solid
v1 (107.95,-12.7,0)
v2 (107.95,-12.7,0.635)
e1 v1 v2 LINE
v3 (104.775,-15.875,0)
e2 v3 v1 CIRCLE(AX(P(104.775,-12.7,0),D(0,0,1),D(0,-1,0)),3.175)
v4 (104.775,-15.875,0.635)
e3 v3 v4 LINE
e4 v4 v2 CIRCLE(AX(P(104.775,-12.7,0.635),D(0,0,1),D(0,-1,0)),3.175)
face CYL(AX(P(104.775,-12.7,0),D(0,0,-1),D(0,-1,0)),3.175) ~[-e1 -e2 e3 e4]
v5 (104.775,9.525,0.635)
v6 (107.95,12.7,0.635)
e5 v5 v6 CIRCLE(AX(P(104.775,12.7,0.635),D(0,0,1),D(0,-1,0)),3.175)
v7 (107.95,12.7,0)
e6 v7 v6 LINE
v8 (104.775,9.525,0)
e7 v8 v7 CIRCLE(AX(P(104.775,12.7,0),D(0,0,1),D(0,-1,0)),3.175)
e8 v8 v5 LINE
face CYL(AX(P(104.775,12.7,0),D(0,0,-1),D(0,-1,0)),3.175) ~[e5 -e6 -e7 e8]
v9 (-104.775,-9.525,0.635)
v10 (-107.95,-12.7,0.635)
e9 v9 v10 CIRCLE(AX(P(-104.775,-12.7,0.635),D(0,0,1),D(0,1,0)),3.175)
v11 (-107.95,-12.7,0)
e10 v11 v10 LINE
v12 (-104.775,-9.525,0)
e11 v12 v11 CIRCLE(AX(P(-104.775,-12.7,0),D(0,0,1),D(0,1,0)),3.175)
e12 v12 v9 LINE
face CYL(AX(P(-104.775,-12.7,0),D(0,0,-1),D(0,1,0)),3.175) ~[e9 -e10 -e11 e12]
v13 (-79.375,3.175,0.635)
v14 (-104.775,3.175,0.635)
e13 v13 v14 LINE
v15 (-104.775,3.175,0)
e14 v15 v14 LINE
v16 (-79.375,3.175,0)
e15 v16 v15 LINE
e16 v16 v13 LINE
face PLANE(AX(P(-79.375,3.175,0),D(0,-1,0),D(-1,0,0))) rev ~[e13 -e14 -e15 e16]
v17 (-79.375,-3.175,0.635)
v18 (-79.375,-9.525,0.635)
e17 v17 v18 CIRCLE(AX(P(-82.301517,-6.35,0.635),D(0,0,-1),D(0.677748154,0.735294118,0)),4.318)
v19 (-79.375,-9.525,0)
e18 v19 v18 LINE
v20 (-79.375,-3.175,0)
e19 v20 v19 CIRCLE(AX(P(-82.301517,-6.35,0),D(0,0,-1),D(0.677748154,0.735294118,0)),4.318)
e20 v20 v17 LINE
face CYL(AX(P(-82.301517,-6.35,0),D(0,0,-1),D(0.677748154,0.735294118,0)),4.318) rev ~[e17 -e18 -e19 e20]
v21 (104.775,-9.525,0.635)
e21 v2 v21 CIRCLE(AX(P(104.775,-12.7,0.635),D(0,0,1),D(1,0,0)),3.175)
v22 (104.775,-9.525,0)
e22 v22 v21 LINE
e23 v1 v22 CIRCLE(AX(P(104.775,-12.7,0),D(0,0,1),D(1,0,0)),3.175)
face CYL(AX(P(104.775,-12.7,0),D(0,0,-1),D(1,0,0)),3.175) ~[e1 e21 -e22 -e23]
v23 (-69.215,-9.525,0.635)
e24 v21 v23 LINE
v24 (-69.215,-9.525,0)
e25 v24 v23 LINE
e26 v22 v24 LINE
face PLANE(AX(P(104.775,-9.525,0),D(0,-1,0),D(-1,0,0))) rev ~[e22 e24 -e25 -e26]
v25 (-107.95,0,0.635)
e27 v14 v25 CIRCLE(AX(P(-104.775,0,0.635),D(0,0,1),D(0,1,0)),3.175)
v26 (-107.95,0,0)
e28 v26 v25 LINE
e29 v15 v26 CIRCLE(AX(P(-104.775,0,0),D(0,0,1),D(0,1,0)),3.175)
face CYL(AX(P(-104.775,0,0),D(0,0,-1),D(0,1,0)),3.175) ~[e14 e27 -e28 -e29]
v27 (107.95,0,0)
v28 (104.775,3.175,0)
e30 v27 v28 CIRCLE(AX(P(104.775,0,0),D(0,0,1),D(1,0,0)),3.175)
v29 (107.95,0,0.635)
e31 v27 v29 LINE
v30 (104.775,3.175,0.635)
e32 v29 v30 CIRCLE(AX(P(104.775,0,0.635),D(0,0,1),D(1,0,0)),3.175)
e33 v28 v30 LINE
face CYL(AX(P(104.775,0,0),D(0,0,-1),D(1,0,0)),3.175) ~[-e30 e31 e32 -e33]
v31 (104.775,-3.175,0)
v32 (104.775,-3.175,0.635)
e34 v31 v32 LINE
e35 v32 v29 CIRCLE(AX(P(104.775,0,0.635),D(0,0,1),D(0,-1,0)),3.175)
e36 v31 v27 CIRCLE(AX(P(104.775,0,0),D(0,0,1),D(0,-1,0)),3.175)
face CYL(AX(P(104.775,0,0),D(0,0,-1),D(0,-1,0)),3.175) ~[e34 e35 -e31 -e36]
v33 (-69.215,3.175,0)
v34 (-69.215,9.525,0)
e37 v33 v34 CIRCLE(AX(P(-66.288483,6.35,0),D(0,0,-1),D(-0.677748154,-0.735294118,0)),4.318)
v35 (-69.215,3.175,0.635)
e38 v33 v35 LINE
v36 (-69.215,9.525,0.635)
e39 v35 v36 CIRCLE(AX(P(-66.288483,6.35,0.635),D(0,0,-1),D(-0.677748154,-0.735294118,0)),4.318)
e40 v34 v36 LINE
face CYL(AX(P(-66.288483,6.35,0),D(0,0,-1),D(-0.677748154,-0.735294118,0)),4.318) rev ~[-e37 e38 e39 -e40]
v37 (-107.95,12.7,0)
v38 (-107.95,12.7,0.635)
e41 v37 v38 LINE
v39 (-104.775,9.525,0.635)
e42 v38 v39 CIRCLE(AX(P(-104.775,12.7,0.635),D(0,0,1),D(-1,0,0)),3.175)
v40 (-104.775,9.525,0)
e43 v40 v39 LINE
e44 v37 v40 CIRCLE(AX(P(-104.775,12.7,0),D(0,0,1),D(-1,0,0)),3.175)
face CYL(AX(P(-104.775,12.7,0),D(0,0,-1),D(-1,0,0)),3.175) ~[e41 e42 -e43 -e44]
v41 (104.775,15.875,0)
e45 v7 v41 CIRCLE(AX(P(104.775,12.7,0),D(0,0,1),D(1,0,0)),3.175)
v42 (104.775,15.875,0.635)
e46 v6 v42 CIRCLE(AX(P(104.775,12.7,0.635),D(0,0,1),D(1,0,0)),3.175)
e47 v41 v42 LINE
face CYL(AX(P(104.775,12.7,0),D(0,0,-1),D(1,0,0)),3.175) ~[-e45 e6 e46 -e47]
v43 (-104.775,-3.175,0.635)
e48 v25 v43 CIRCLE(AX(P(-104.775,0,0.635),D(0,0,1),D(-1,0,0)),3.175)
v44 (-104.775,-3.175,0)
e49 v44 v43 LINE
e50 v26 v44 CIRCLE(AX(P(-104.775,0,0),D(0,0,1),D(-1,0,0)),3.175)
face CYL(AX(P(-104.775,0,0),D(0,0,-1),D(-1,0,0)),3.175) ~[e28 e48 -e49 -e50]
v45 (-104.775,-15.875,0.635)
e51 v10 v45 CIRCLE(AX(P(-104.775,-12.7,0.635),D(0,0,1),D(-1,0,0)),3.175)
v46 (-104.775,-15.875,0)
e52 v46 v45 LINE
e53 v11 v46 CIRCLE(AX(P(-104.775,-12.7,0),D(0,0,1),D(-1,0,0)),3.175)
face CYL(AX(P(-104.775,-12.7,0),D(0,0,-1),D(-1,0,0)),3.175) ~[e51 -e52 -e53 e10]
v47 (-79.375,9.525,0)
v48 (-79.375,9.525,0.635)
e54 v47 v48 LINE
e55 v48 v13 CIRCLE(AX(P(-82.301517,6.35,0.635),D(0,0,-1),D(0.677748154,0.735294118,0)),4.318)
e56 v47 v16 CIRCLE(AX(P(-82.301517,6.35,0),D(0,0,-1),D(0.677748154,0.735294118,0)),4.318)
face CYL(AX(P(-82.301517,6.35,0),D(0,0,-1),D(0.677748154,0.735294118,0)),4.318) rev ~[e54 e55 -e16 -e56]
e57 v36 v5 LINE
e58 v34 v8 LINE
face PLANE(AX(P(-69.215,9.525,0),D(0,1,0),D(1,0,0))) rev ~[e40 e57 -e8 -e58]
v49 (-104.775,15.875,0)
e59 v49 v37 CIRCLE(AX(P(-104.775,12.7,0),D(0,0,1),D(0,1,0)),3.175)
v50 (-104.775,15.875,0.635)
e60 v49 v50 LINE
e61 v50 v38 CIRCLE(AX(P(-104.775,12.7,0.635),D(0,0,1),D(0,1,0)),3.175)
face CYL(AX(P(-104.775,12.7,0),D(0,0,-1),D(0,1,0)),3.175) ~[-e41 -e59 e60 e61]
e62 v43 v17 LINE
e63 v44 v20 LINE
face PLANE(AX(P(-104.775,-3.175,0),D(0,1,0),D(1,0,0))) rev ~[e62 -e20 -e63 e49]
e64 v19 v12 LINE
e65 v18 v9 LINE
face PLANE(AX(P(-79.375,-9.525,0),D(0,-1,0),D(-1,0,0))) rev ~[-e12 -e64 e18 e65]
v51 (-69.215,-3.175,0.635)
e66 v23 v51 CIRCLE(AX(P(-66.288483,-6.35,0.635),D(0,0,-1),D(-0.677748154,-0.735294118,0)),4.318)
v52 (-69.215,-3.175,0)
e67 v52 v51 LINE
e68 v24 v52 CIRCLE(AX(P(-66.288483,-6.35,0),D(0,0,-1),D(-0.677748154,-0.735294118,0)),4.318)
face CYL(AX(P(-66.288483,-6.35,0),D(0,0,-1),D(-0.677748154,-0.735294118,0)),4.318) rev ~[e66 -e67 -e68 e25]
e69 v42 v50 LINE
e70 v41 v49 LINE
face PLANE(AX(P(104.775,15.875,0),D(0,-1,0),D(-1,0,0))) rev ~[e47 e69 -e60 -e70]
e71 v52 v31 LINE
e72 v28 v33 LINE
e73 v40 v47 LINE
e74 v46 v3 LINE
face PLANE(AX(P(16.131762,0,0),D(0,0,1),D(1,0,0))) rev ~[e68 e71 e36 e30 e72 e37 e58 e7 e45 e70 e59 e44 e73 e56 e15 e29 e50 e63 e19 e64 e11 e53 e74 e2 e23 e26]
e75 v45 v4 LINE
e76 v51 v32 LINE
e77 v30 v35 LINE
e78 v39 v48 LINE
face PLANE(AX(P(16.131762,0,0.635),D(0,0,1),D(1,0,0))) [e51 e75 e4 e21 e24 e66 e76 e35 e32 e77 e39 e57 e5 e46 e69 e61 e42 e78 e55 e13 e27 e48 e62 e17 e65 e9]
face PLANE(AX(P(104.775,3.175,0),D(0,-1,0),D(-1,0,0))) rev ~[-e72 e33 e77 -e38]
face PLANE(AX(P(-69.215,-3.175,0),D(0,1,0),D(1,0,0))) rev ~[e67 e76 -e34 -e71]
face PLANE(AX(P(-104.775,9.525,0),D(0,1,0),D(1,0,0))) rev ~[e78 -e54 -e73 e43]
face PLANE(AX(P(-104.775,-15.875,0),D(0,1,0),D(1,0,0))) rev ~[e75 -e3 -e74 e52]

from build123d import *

# Parameters (mm, degrees)
F1_DEPTH = 0.635


# Not quite as in the source:
# - a feature names something its author has since deleted; it is built from what else it names


with BuildPart() as f1:
    # F0 (on Top) → F1 (new body)
    with BuildSketch(Plane.XY):
        with BuildLine():
            ThreePointArc((107.95, 0), (107.0200640303, 2.2450640303), (104.775, 3.175))
            Line((104.775, 3.175), (-69.215, 3.175))
            Line((-69.215, 3.175), (-74.295, 3.175))
            Line((-74.295, 3.175), (-74.295, -3.175))
            Line((-74.295, -3.175), (-69.215, -3.175))
            Line((-69.215, -3.175), (104.775, -3.175))
            ThreePointArc((104.775, -3.175), (107.0200640303, -2.2450640303), (107.95, 0))
        make_face()
        with BuildLine():
            Line((-74.295, -3.175), (-74.295, 3.175))
            Line((-74.295, 3.175), (-79.375, 3.175))
            Line((-79.375, 3.175), (-104.775, 3.175))
            ThreePointArc((-104.775, 3.175), (-107.0200640303, 2.2450640303), (-107.95, 0))
            ThreePointArc((-107.95, 0), (-107.0200640303, -2.2450640303), (-104.775, -3.175))
            Line((-104.775, -3.175), (-79.375, -3.175))
            Line((-79.375, -3.175), (-74.295, -3.175))
        make_face()
        with BuildLine():
            Line((-74.295, 9.525), (-69.215, 9.525))
            Line((-69.215, 9.525), (104.775, 9.525))
            ThreePointArc((104.775, 9.525), (107.0200640303, 10.4549359697), (107.95, 12.7))
            ThreePointArc((107.95, 12.7), (107.0200640302, 14.9450640302), (104.775, 15.875))
            Line((104.775, 15.875), (-74.295, 15.875))
            Line((-74.295, 15.875), (-74.295, 9.525))
        make_face()
        with BuildLine():
            Line((-79.375, 9.525), (-74.295, 9.525))
            Line((-74.295, 9.525), (-74.295, 15.875))
            Line((-74.295, 15.875), (-104.775, 15.875))
            ThreePointArc((-104.775, 15.875), (-107.0200640302, 14.9450640302), (-107.95, 12.7))
            ThreePointArc((-107.95, 12.7), (-107.0200640303, 10.4549359697), (-104.775, 9.525))
            Line((-104.775, 9.525), (-79.375, 9.525))
        make_face()
        with BuildLine():
            Line((-69.2150000001, -9.5250000001), (-74.295, -9.5250000001))
            Line((-74.295, -9.5250000001), (-74.295, -15.875))
            Line((-74.295, -15.875), (104.775, -15.875))
            ThreePointArc((104.775, -15.875), (107.0200640302, -14.9450640302), (107.95, -12.7))
            ThreePointArc((107.95, -12.7), (107.0200640303, -10.4549359697), (104.775, -9.525))
            Line((104.775, -9.5250000001), (-69.2150000001, -9.5250000001))
        make_face()
        with BuildLine():
            Line((-74.295, -15.875), (-74.295, -9.5250000001))
            Line((-74.295, -9.5250000001), (-79.375, -9.5250000001))
            Line((-79.375, -9.5250000001), (-104.775, -9.5250000001))
            ThreePointArc((-104.775, -9.525), (-107.0200640303, -10.4549359697), (-107.95, -12.7))
            ThreePointArc((-107.95, -12.7), (-107.0200640302, -14.9450640302), (-104.775, -15.875))
            Line((-104.775, -15.875), (-74.295, -15.875))
        make_face()
        with BuildLine():
            Line((-79.375, 3.175), (-74.295, 3.175))
            Line((-74.295, 3.175), (-74.295, 9.525))
            Line((-74.295, 9.525), (-79.375, 9.525))
            ThreePointArc((-79.375, 9.525), (-77.98351653, 6.35), (-79.375, 3.175))
        make_face()
        with BuildLine():
            Line((-74.295, 3.175), (-69.215, 3.175))
            ThreePointArc((-69.215, 3.175), (-70.6064834701, 6.35), (-69.215, 9.525))
            Line((-69.215, 9.525), (-74.295, 9.525))
            Line((-74.295, 9.525), (-74.295, 3.175))
        make_face()
        with BuildLine():
            Line((-74.295, -9.5250000001), (-74.295, -3.175))
            Line((-74.295, -3.175), (-79.375, -3.175))
            ThreePointArc((-79.375, -3.175), (-77.9835165299, -6.35), (-79.375, -9.525))
            Line((-79.375, -9.5250000001), (-74.295, -9.5250000001))
        make_face()
        with BuildLine():
            Line((-69.215, -3.175), (-74.295, -3.175))
            Line((-74.295, -3.175), (-74.295, -9.5250000001))
            Line((-74.295, -9.5250000001), (-69.2150000001, -9.5250000001))
            ThreePointArc((-69.2150000001, -9.525), (-70.6064834702, -6.35), (-69.215, -3.175))
        make_face()
    extrude(amount=F1_DEPTH)


solid = f1.part
